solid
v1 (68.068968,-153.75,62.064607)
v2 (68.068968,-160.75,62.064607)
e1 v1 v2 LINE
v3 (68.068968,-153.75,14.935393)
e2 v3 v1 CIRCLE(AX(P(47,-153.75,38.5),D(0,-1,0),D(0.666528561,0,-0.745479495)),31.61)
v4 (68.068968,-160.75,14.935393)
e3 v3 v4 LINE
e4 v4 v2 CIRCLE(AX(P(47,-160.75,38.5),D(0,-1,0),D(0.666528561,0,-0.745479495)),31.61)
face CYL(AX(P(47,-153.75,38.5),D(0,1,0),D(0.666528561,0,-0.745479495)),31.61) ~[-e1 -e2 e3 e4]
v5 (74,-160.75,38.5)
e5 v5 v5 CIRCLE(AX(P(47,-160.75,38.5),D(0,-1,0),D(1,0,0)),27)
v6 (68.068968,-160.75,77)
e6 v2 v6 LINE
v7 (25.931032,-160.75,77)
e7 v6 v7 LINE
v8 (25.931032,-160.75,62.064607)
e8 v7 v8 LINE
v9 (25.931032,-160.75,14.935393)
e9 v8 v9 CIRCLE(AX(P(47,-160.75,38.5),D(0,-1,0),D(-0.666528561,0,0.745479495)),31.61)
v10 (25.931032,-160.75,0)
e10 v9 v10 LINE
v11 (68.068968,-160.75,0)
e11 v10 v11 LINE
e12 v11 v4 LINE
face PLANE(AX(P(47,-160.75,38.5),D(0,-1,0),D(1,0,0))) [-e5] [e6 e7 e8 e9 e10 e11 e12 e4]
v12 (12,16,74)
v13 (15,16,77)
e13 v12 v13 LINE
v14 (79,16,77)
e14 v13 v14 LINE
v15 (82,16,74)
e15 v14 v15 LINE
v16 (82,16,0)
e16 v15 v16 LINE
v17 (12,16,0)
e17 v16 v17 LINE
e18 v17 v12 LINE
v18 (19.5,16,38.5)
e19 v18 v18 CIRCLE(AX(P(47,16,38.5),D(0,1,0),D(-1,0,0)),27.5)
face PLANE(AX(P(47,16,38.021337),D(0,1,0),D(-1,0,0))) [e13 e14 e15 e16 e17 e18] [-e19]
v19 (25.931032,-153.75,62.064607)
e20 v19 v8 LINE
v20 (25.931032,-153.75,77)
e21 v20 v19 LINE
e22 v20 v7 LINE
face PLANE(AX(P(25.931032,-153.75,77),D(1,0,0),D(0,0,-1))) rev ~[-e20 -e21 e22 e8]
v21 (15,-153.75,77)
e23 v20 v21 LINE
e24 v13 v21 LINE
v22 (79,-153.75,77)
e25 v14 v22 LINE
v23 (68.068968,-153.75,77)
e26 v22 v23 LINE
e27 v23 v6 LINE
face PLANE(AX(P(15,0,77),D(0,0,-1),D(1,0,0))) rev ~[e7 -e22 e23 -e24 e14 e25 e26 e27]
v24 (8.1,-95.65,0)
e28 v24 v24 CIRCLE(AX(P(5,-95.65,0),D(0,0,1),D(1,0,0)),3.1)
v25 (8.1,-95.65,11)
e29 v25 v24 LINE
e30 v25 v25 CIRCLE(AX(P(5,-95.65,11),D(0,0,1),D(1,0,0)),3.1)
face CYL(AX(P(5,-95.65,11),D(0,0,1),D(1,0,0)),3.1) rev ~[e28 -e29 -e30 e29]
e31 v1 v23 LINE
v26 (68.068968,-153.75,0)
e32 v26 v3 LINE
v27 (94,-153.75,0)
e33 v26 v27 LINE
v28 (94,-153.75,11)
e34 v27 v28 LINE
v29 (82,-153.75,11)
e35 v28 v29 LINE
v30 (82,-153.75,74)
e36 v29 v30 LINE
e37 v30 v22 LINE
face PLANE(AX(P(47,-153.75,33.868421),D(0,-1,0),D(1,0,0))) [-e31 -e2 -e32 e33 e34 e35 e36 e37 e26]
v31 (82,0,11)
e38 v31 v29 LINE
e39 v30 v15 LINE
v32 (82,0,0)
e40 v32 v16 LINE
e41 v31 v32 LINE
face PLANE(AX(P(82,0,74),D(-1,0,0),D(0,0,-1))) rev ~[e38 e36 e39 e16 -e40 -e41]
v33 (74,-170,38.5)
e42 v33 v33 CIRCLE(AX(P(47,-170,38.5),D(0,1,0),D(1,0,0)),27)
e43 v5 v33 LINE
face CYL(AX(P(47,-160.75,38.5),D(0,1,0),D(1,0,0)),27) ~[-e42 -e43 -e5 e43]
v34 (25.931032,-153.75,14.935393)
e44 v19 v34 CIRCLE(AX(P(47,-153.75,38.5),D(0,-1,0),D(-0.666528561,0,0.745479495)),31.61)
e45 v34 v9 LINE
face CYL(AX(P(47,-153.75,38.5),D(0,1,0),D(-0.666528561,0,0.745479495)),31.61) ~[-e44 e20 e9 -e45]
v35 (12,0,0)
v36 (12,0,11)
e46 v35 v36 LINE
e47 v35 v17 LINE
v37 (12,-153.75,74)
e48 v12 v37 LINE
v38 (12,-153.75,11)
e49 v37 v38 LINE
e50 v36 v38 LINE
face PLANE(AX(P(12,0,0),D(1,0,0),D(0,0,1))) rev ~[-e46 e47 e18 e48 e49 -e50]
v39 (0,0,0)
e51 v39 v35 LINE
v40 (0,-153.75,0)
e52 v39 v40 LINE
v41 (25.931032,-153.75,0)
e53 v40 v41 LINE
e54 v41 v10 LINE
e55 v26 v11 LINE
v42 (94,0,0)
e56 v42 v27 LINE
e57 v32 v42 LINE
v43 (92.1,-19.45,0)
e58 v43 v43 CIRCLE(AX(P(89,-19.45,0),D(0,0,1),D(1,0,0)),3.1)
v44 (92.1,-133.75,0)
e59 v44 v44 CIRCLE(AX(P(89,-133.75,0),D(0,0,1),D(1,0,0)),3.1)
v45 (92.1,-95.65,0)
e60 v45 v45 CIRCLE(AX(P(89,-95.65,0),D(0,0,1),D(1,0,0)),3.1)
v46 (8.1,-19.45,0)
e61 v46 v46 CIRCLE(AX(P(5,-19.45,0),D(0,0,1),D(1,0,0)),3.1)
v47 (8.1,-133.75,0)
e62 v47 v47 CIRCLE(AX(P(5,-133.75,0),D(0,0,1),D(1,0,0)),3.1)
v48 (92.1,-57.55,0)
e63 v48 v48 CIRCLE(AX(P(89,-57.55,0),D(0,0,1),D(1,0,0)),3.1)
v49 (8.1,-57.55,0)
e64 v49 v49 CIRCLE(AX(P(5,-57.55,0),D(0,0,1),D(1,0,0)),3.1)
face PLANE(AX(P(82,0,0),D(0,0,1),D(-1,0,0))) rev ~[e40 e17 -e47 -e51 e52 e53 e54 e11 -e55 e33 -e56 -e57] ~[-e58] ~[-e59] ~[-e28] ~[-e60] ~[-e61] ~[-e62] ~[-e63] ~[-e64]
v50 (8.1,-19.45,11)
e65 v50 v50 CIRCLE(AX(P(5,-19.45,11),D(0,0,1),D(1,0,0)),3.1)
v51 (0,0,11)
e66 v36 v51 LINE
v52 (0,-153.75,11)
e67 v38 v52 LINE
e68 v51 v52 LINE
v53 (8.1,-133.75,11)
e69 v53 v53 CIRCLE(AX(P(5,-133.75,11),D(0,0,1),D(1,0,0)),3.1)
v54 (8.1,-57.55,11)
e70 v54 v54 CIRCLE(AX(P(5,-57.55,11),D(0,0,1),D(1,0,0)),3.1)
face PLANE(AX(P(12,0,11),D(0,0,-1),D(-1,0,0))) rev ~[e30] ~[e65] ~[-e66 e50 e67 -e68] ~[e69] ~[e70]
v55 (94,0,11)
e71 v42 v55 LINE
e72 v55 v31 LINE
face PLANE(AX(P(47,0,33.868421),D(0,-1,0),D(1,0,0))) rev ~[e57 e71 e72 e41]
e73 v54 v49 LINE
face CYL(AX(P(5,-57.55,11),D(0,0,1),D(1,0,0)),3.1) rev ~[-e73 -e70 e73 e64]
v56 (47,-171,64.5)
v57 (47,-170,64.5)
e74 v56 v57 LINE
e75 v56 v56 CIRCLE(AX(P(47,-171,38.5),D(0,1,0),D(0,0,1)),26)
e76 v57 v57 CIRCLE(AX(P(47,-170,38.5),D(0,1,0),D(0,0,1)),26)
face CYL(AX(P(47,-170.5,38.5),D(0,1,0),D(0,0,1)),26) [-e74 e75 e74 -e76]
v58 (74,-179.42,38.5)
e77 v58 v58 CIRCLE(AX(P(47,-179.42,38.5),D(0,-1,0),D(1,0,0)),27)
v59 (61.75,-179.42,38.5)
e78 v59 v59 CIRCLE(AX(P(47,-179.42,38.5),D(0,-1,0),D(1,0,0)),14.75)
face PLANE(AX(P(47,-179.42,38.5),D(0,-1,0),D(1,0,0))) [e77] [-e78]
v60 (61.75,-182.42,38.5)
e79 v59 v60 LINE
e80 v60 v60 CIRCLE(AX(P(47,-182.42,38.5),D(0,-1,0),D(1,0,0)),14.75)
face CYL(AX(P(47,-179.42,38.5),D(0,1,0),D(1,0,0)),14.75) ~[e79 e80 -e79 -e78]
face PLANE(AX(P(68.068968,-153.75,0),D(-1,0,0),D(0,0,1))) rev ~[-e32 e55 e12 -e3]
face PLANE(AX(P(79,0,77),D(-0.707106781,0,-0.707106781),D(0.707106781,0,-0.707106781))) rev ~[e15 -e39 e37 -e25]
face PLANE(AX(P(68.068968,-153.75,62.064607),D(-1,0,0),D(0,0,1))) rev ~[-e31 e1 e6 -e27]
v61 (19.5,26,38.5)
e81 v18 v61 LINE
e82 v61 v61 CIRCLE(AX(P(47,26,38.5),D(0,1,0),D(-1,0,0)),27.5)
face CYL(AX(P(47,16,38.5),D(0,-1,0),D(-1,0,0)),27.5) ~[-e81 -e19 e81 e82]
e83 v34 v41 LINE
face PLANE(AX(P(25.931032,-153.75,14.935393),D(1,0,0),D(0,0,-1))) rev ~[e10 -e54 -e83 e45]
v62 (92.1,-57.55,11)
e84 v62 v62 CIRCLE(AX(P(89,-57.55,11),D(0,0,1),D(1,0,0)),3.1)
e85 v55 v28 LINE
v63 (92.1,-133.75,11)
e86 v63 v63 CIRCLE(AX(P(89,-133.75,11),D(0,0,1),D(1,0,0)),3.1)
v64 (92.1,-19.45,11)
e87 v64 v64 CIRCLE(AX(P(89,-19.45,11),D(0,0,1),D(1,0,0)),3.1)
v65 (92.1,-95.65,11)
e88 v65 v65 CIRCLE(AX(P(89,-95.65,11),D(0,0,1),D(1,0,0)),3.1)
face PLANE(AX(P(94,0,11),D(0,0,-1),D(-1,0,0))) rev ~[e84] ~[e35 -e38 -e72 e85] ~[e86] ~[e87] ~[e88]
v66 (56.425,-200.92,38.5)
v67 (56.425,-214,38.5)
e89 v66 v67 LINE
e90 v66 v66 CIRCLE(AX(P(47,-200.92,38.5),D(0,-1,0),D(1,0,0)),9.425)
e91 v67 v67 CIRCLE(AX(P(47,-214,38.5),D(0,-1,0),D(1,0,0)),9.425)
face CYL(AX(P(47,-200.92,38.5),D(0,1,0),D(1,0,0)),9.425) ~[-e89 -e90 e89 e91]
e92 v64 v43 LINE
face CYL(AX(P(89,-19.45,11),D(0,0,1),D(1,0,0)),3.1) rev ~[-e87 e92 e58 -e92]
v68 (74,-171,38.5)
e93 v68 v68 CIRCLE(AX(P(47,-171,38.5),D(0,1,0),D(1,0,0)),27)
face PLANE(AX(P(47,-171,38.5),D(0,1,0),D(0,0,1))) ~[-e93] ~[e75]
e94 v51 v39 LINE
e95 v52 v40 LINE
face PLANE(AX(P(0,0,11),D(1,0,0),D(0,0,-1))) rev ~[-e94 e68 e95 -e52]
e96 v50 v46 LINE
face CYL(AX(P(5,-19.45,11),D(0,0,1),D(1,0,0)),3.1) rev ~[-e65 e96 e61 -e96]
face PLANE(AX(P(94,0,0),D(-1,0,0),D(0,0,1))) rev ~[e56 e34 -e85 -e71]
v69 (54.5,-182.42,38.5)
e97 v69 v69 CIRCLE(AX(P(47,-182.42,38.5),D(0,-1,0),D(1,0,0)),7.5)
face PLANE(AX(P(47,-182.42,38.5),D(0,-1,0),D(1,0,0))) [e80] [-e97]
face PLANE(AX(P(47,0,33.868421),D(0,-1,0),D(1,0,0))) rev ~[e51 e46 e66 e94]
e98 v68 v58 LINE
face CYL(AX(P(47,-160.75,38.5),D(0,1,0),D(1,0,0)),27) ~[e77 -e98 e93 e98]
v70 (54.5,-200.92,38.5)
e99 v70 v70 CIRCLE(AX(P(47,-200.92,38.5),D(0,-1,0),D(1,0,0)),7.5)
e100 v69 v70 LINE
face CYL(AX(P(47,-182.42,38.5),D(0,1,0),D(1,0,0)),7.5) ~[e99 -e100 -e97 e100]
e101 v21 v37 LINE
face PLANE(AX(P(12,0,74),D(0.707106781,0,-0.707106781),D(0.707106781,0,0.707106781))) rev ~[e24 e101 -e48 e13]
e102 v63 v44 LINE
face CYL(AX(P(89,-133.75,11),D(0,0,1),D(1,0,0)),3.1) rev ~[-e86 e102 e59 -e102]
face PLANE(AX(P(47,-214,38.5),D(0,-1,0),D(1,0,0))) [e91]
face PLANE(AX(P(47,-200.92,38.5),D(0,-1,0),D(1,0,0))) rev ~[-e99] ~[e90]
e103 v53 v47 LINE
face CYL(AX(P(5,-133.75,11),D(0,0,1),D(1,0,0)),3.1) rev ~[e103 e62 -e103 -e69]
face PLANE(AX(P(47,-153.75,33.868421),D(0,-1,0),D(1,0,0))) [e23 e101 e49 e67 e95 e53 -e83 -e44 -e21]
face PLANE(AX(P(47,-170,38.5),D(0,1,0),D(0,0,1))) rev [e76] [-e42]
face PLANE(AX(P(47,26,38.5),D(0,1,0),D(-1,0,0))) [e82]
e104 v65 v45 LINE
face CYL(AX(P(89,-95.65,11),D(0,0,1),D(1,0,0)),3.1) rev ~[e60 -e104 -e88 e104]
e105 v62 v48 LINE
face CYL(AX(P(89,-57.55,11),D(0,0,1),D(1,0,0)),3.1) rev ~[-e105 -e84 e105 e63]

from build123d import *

# Parameters (mm, degrees)
F1_DEPTH  = 153.75
F2_SIZE   = 3
F3_R      = 3.1
F4_DEPTH  = 11.001
F6_DEPTH  = 7
F7_R      = 27
F8_DEPTH  = 18.67
F9_R      = 14.75
F10_DEPTH = 3
F12_W     = 1
F12_H     = 1
F14_R     = 7.5
F15_DEPTH = 18.5
F16_R     = 9.425
F16_R_2   = 7.5
F17_DEPTH = 13.08
F19_DEPTH = 16
F20_R     = 27.5
F21_DEPTH = 10


# Not quite as in the source:
# - the program builds the solid bodies; features that only make, move or delete a surface that nothing else refers to are left out


with BuildPart() as f1:
    # F0 (on Front) → F1 (new body)
    with BuildSketch(Plane.XZ):
        Polygon((0, 11), (0, 0), (94, 0), (94, 11), (82, 11), (82, 77), (12, 77), (12, 11), align=None)
    extrude(amount=F1_DEPTH)

    # F2
    f2_edges = [f1.edges().sort_by_distance(p)[0] for p in [
        (12, -76.875, 77),
        (82, -76.875, 77),
    ]]
    chamfer(f2_edges, length=F2_SIZE)

    # F3 (on face) → F4 (cut, through all)
    with BuildSketch(Plane.XY.offset(11)):
        with Locations((89, -133.75)):
            Circle(F3_R)
        with Locations((89, -95.65)):
            Circle(F3_R)
        with Locations((89, -57.55)):
            Circle(F3_R)
        with Locations((89, -19.45)):
            Circle(F3_R)
        with Locations((5, -19.45)):
            Circle(F3_R)
        with Locations((5, -57.55)):
            Circle(F3_R)
        with Locations((5, -95.65)):
            Circle(F3_R)
        with Locations((5, -133.75)):
            Circle(F3_R)
    extrude(amount=-F4_DEPTH, mode=Mode.SUBTRACT)

    # F5 (on face) → F6 (join)
    with BuildSketch(Plane.XZ.offset(153.75)):
        with BuildLine():
            Line((25.9310321962, 77), (25.9310321962, 62.0646068434))
            ThreePointArc((25.9310321962, 62.0646068434), (15.39, 38.5), (25.9310321962, 14.9353931566))
            Line((25.9310321962, 14.9353931566), (25.9310321962, 0))
            Line((25.9310321962, 0), (68.0689678038, 0))
            Line((68.0689678038, 0), (68.0689678038, 14.9353931566))
            ThreePointArc((68.0689678038, 14.9353931566), (78.61, 38.5), (68.0689678038, 62.0646068434))
            Line((68.0689678038, 62.0646068434), (68.0689678038, 77))
            Line((68.0689678038, 77), (25.9310321962, 77))
        make_face()
    extrude(amount=F6_DEPTH)

    # F7 (on face) → F8 (join)
    with BuildSketch(Plane.XZ.offset(160.75)):
        with Locations((47, 38.5)):
            Circle(F7_R)
    extrude(amount=F8_DEPTH)

    # F9 (on face) → F10 (join)
    with BuildSketch(Plane.XZ.offset(179.42)):
        with Locations((47, 38.5)):
            Circle(F9_R)
    extrude(amount=F10_DEPTH)

    # F12 (on offset) → F13 (revolve, cut)
    with BuildSketch(Plane.YZ.offset(47)):
        with Locations((-170.5, 65)):
            Rectangle(F12_W, F12_H)
    revolve(axis=Axis((47, -160.75, 38.5), (0, 1, 0)), mode=Mode.SUBTRACT)

    # F14 (on face) → F15 (join)
    with BuildSketch(Plane.XZ.offset(182.42)):
        with Locations((47, 38.5)):
            Circle(F14_R)
    extrude(amount=F15_DEPTH)

    # F16 (on face) → F17 (join)
    with BuildSketch(Plane.XZ.offset(200.92)):
        with Locations((47, 38.5)):
            Circle(F16_R)
        with Locations((47, 38.5)):
            Circle(F16_R_2, mode=Mode.SUBTRACT)
        with Locations((47, 38.5)):
            Circle(F16_R_2)
    extrude(amount=F17_DEPTH)

    # F18 (on face) → F19 (join)
    with BuildSketch(Plane(origin=(0, 0, 0), x_dir=(-1, 0, 0), z_dir=(0, 1, 0))):
        Polygon((-79, 77), (-82, 74), (-82, 0), (-12, 0), (-12, 74), (-15, 77), align=None)
    extrude(amount=F19_DEPTH)

    # F20 (on face) → F21 (join)
    with BuildSketch(Plane(origin=(0, 16, 0), x_dir=(-1, 0, 0), z_dir=(0, 1, 0))):
        with Locations((-47, 38.5)):
            Circle(F20_R)
    extrude(amount=F21_DEPTH)


solid = f1.part
